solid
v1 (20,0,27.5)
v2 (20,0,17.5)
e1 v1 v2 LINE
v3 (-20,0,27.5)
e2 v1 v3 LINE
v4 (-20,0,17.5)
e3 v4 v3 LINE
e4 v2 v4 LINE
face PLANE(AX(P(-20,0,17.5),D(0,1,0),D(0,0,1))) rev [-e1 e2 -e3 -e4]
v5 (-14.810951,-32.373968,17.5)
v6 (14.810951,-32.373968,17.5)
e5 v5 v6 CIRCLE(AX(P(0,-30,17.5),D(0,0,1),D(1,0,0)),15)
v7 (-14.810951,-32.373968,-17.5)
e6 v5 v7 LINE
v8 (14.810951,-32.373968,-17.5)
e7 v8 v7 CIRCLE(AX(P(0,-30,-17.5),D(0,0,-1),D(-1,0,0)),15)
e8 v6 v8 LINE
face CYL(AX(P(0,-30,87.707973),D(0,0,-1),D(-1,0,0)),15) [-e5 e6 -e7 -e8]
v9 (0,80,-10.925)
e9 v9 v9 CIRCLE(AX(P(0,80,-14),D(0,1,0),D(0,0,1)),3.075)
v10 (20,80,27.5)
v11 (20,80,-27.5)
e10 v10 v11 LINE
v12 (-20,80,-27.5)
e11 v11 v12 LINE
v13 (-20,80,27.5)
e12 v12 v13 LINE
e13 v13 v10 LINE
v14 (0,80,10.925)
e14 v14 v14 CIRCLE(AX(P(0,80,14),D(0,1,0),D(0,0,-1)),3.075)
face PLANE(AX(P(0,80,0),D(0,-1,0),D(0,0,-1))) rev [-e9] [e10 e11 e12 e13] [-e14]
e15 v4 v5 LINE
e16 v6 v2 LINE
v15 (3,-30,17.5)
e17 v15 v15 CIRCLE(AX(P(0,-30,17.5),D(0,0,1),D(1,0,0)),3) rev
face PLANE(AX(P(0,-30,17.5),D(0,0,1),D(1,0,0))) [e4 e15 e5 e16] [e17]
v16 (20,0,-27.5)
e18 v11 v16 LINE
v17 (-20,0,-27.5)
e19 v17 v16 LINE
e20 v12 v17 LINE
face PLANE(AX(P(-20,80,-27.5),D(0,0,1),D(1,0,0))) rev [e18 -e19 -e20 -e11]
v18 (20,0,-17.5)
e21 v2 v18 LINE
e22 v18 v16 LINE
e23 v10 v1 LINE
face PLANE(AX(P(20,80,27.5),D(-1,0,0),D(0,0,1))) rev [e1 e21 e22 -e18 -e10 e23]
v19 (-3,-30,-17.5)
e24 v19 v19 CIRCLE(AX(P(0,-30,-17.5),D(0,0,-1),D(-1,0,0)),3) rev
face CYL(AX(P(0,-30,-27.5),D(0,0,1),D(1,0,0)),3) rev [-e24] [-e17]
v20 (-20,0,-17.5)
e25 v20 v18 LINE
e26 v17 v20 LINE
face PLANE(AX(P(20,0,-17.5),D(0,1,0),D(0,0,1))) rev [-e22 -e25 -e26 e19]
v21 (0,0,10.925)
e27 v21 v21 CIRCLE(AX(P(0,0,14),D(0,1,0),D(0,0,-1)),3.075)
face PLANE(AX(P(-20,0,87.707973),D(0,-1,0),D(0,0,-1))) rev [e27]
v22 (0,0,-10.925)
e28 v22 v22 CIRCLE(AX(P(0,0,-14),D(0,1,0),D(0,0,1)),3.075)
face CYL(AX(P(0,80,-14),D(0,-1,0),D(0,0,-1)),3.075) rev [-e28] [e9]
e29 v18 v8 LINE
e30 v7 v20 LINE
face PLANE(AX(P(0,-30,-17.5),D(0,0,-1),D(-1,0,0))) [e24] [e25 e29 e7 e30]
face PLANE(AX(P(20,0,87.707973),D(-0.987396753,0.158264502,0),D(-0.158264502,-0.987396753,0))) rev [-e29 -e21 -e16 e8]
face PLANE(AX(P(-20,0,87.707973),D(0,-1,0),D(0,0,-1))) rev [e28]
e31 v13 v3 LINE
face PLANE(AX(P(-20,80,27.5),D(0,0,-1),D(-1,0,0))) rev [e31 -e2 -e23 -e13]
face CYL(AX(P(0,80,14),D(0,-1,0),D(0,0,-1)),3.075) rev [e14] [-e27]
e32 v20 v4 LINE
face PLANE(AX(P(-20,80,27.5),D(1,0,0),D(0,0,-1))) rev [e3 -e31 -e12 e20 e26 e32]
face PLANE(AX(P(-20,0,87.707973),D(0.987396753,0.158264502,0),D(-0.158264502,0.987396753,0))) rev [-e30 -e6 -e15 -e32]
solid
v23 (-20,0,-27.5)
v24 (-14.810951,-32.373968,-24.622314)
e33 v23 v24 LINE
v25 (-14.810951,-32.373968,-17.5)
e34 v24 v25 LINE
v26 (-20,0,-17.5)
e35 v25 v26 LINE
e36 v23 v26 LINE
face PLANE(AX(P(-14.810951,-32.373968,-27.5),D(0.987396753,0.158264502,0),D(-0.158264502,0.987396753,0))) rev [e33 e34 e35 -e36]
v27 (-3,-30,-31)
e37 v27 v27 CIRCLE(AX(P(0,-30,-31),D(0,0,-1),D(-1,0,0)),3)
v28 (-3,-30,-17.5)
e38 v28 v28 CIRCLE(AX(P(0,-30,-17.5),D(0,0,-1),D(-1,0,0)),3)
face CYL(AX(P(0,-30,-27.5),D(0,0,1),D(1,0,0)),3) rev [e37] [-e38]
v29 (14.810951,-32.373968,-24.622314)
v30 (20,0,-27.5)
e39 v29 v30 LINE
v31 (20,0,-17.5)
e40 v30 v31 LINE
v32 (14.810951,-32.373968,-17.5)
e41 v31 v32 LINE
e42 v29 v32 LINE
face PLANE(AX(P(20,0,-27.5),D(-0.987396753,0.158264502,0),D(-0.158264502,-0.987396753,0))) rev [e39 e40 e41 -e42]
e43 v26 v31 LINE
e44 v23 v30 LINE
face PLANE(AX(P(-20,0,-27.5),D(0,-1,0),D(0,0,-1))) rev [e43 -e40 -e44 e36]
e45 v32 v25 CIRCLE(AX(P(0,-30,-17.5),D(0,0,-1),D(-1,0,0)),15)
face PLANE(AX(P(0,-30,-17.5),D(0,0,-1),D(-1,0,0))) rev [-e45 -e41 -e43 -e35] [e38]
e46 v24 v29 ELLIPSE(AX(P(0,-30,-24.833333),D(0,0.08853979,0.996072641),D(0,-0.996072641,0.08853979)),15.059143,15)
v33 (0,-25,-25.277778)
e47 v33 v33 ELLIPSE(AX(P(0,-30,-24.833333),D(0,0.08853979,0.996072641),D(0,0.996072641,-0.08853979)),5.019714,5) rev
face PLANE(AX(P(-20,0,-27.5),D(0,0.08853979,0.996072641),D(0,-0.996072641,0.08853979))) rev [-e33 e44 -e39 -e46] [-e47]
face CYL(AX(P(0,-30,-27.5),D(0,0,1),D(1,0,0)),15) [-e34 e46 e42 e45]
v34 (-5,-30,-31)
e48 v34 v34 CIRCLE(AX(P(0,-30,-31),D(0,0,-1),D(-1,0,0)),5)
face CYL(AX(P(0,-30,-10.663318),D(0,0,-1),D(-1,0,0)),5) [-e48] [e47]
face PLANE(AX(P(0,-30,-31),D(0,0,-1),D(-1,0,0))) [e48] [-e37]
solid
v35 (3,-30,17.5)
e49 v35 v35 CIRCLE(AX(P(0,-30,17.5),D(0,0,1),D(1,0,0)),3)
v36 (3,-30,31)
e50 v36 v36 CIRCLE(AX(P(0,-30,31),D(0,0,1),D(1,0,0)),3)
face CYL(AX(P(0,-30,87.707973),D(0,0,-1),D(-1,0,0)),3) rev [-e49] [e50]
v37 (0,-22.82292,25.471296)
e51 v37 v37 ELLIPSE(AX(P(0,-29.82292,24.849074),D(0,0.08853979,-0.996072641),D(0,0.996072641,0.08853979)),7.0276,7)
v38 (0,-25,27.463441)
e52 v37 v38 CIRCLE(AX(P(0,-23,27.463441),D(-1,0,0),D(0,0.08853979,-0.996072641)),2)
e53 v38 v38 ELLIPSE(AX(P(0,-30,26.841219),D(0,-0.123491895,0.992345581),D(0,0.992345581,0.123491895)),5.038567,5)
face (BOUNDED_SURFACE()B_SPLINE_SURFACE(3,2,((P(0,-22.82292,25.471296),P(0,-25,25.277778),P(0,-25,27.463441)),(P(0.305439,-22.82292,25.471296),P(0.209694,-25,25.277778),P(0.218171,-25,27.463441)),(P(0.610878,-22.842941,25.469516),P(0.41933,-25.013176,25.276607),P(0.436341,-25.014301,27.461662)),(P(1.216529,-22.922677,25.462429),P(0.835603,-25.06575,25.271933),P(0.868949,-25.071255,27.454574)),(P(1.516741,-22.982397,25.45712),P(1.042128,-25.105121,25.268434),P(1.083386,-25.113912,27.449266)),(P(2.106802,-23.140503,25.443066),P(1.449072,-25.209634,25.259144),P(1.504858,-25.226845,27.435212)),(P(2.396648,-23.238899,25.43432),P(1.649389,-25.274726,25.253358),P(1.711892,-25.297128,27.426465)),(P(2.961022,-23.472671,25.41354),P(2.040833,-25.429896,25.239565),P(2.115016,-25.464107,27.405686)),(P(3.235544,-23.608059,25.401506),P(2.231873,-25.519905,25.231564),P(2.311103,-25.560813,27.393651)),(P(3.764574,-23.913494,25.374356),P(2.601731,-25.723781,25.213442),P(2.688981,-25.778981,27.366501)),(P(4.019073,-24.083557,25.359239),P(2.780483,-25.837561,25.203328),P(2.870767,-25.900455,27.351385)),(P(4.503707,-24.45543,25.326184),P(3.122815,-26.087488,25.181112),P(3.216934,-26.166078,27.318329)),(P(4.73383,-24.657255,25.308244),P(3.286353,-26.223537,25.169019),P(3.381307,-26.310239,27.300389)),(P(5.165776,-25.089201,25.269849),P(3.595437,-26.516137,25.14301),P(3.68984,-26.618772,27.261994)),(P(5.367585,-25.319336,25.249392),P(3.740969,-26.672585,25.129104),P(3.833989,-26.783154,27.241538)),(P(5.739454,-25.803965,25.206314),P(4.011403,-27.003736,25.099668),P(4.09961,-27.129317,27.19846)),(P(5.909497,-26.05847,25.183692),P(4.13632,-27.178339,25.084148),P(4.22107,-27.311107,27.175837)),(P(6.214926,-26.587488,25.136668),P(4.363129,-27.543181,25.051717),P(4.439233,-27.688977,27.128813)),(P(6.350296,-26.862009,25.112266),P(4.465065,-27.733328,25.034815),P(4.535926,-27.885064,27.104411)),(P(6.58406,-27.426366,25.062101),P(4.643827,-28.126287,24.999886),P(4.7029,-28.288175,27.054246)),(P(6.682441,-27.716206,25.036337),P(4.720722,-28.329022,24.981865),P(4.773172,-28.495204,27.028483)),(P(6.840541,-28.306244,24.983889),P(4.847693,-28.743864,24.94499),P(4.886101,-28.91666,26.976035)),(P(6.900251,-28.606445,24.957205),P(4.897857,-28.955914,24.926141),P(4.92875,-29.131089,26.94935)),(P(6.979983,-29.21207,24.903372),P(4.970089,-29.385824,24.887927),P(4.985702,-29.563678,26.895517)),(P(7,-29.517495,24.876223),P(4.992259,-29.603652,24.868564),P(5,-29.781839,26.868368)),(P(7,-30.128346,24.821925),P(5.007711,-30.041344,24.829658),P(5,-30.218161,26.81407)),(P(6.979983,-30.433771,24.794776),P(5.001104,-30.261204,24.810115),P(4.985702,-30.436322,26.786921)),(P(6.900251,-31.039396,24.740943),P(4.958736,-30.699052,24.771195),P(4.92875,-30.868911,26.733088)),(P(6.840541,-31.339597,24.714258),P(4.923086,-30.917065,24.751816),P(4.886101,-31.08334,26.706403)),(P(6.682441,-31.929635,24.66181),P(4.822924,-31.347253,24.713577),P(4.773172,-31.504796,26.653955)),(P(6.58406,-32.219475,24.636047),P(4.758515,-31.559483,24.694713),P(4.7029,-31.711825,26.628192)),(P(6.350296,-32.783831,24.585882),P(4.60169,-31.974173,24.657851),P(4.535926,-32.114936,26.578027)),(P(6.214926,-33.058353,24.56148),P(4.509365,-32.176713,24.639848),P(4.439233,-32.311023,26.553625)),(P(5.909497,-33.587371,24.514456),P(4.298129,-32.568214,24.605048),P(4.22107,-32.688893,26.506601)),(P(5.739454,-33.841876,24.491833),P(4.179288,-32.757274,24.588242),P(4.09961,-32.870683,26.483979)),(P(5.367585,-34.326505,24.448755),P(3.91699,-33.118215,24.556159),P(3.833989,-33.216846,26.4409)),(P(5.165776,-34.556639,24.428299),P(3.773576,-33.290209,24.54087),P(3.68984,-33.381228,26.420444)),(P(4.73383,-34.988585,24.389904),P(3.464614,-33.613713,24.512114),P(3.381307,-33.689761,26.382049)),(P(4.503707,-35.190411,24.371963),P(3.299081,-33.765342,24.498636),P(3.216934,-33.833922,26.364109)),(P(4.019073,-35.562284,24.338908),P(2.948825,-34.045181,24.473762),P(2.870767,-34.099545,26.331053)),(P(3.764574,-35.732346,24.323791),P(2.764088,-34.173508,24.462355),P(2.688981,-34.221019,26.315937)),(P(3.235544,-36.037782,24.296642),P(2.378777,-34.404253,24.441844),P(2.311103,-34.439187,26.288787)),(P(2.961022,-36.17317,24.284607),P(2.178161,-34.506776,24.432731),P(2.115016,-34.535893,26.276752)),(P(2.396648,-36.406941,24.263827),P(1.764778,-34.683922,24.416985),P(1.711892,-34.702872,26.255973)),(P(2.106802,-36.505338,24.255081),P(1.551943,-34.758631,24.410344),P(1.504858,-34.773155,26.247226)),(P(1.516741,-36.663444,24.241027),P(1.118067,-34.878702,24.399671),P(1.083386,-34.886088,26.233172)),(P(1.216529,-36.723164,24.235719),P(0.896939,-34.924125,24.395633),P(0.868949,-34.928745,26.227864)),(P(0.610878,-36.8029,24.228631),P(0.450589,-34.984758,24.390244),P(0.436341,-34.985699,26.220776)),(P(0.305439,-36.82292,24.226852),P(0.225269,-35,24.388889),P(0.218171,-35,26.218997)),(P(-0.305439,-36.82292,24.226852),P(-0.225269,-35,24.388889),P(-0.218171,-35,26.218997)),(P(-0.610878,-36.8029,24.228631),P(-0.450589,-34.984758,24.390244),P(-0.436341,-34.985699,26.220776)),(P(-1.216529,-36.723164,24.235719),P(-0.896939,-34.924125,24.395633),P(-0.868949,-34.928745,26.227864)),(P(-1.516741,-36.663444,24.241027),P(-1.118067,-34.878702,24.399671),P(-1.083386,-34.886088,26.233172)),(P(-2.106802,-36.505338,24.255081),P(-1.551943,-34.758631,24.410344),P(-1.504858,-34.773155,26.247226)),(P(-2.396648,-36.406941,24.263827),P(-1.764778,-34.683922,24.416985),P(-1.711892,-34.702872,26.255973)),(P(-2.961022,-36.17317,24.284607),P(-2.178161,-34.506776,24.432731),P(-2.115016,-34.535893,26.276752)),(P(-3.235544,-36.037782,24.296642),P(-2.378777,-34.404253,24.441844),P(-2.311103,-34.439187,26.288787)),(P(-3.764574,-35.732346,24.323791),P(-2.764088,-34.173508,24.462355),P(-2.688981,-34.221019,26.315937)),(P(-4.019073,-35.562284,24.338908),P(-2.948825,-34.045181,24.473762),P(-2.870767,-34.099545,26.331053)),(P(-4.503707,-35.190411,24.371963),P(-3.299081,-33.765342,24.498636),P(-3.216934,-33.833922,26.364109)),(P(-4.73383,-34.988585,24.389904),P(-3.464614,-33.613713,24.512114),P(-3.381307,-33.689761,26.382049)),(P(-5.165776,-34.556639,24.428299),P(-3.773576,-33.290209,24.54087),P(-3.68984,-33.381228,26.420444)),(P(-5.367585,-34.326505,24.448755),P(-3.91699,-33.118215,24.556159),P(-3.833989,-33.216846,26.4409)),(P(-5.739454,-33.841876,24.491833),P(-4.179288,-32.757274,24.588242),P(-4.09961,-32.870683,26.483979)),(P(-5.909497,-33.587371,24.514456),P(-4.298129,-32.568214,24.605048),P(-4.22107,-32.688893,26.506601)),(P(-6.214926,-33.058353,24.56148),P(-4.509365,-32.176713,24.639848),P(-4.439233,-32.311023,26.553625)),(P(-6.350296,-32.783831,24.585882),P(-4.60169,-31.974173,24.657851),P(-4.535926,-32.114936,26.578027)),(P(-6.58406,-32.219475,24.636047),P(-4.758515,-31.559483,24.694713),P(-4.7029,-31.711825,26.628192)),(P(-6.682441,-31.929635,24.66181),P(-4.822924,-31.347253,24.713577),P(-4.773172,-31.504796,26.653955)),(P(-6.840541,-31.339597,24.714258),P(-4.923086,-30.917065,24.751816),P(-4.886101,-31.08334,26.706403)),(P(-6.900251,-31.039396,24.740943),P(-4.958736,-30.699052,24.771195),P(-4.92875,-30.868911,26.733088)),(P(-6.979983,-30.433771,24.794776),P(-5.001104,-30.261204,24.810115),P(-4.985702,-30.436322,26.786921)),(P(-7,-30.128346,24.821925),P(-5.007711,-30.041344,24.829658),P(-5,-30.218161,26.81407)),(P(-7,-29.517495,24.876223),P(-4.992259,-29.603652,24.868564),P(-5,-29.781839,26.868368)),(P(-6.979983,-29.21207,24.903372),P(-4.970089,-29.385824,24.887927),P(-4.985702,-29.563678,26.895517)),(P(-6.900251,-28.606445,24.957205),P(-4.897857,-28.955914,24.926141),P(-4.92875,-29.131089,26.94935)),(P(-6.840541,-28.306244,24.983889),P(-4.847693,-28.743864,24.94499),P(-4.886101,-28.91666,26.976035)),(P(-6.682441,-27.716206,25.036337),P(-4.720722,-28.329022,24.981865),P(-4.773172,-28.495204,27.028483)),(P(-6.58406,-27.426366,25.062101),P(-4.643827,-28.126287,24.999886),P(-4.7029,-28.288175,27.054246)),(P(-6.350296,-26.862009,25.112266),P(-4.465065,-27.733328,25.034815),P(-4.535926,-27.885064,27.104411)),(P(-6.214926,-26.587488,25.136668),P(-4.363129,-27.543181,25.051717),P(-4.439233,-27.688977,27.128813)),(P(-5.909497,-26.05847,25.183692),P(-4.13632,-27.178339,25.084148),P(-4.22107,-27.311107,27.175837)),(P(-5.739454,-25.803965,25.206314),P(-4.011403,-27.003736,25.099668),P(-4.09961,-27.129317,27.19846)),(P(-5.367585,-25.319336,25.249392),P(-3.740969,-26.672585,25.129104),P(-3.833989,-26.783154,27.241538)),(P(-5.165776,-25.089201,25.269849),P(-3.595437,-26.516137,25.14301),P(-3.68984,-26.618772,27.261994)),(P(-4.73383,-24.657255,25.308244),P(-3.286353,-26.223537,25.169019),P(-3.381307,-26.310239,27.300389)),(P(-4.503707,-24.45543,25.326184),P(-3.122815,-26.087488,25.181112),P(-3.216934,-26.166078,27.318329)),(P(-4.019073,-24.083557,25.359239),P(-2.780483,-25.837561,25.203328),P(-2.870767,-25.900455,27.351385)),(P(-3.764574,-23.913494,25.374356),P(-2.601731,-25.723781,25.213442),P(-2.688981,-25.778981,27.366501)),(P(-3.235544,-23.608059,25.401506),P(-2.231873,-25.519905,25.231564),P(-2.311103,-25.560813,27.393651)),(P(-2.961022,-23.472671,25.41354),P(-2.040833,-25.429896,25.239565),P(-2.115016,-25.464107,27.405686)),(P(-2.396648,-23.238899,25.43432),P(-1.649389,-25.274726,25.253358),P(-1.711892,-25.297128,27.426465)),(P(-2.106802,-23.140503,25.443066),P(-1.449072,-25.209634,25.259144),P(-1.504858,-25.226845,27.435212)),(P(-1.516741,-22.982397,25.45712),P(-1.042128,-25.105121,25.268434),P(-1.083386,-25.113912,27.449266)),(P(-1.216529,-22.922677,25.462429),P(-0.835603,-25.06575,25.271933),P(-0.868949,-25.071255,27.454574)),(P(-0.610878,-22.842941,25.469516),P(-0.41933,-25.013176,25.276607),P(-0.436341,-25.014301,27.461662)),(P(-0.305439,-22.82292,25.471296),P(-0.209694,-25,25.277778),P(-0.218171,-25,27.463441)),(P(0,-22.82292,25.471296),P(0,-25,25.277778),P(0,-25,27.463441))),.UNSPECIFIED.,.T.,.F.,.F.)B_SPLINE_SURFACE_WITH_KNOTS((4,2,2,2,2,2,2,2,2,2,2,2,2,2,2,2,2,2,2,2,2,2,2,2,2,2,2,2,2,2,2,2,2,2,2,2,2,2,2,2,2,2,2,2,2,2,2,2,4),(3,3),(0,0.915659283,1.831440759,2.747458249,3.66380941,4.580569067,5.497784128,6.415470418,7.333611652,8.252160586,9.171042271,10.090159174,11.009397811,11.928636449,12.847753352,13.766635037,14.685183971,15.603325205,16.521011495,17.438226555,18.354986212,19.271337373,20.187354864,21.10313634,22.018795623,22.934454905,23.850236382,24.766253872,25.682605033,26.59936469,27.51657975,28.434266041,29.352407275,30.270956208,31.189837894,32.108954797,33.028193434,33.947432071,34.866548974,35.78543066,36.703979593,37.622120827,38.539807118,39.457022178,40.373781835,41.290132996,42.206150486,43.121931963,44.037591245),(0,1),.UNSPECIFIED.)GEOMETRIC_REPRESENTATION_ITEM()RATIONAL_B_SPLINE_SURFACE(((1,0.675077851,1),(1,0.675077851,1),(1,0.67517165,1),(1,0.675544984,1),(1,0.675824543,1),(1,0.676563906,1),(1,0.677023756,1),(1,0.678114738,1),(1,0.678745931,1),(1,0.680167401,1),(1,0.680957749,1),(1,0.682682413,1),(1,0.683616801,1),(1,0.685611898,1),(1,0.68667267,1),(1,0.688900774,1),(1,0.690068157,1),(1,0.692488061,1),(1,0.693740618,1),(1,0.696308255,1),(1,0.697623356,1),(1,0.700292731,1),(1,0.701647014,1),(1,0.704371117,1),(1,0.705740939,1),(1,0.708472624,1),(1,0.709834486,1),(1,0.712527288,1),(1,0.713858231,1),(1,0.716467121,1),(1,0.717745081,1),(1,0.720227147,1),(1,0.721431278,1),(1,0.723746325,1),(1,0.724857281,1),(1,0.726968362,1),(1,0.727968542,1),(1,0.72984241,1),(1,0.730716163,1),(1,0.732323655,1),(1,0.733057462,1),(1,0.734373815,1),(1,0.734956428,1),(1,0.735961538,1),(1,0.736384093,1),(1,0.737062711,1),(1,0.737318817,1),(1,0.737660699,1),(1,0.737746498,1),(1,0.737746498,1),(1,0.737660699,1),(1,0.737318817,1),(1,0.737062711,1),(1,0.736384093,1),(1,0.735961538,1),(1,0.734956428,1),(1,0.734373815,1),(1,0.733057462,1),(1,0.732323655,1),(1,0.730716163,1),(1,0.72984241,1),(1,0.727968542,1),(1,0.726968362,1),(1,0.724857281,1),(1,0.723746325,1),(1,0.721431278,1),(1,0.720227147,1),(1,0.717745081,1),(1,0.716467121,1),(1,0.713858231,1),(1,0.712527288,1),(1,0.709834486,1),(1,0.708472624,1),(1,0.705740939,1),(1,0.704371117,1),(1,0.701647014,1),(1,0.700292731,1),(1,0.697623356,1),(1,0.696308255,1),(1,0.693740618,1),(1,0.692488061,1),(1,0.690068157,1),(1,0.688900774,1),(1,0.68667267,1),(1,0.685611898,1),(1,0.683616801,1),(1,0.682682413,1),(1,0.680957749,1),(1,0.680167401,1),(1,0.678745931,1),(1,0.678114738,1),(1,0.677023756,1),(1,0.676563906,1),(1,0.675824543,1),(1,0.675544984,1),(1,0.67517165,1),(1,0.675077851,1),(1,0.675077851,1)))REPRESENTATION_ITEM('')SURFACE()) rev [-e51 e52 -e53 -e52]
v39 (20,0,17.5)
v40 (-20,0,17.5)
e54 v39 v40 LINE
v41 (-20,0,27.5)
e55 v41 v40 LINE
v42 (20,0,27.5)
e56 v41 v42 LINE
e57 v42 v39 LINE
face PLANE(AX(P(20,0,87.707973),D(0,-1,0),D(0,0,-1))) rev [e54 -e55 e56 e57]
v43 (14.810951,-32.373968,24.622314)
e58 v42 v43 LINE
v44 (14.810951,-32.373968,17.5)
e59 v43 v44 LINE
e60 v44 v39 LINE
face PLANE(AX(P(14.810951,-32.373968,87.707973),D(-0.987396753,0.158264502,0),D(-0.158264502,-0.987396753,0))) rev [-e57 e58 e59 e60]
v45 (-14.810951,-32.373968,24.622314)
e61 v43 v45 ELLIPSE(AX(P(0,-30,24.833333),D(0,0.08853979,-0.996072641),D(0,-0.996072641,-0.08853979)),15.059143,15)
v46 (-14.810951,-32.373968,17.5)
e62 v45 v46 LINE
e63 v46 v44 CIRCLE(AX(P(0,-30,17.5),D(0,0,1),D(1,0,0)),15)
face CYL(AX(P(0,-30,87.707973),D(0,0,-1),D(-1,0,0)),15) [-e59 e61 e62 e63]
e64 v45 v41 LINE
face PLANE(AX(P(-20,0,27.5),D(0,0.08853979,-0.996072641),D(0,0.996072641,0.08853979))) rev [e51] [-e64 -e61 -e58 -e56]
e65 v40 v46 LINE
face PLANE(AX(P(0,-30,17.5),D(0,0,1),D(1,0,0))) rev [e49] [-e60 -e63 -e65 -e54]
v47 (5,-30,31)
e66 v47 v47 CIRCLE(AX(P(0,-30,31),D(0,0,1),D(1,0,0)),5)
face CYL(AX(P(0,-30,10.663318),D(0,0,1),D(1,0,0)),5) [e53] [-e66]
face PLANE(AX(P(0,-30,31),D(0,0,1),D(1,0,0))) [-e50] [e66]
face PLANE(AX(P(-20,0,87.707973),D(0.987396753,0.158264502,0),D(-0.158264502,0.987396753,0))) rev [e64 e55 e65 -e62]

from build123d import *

# Parameters (mm, degrees)
CROQUIS1_W                          = 40
CROQUIS1_H                          = 55
SALIENTE_EXTRUIR1_DEPTH             = 80
CROQUIS2_R                          = 3.075
CORTAR_EXTRUIR2_DEPTH               = 87.926693254
SALIENTE_EXTRUIR2_REACH             = 88.927
SALIENTE_EXTRUIR2_DIRECTION_2_REACH = 88.927
CORTAR_EXTRUIR6_DEPTH               = 87.926693254
CORTAR_EXTRUIR6_DEPTH_BACK          = 87.926693254
CROQUIS6_R                          = 3
CORTAR_EXTRUIR10_DEPTH              = 10
CROQUIS11_R                         = 3
SALIENTE_EXTRUIR3_DEPTH             = 10
CORTAR_EXTRUIR11_DEPTH              = 87.926693254
CORTAR_EXTRUIR11_DEPTH_BACK         = 87.926693254
CORTAR_EXTRUIR15_START              = -10
CORTAR_EXTRUIR15_DEPTH              = 10
CROQUIS17_R                         = 3
SALIENTE_EXTRUIR4_DEPTH             = 10
CORTAR_EXTRUIR16_DEPTH              = 87.926693254
CORTAR_EXTRUIR16_DEPTH_BACK         = 87.926693254
CROQUIS21_R                         = 5
CROQUIS21_R_2                       = 3
SALIENTE_EXTRUIR5_DEPTH             = 3.5
SALIENTE_EXTRUIR5_DIRECTION_2_REACH = 101.121
REDONDEO1_R                         = 2
CROQUIS22_R                         = 5
CROQUIS22_R_2                       = 3
SALIENTE_EXTRUIR6_DEPTH             = 3.5
SALIENTE_EXTRUIR6_DIRECTION_2_REACH = 103.105


with BuildPart() as part:
    # Croquis1 → Saliente-Extruir1 (new body)
    with BuildSketch(Plane(origin=(0, 0, 0), x_dir=(1, 0, 0), z_dir=(0, 1, 0))):
        Rectangle(CROQUIS1_W, CROQUIS1_H)
    extrude(amount=SALIENTE_EXTRUIR1_DEPTH)

    # Croquis2 → Cortar-Extruir2 (cut, through all)
    with BuildSketch(Plane(origin=(0, 0, 0), x_dir=(1, 0, 0), z_dir=(0, 1, 0))):
        with Locations(Location((0, 14, 0), (0, 0, 270))):
            Circle(CROQUIS2_R)
        with Locations(Location((0, -14, 0), (0, 0, 90))):
            Circle(CROQUIS2_R)
    extrude(amount=CORTAR_EXTRUIR2_DEPTH, mode=Mode.SUBTRACT)

    # Saliente-Extruir2: up to this face of the body (flat: up to its plane)
    saliente_extruir2_end = Plane(part.part.faces().sort_by_distance((0, 40, 27.5))[0])
    # Croquis5 → Saliente-Extruir2 (add, up to the picked face)
    with BuildSketch(Plane.XY, mode=Mode.PRIVATE) as saliente_extruir2_sk1:
        with BuildLine():
            Line((-20, 0), (-14.810951292, -32.373967528))
            ThreePointArc((-14.810951292, -32.373967528), (0, -45), (14.810951292, -32.373967528))
            Line((14.810951292, -32.373967528), (20, 0))
            Line((20, 0), (-20, 0))
        make_face()
    saliente_extruir2_tool1 = split(extrude(saliente_extruir2_sk1.sketch, amount=SALIENTE_EXTRUIR2_REACH, mode=Mode.PRIVATE), bisect_by=saliente_extruir2_end, keep=Keep.BOTH, mode=Mode.PRIVATE)
    add(saliente_extruir2_tool1.solids().sort_by(Axis((0, -19.849245, 0), (0, 0, 1)))[0])

    # Saliente-Extruir2 direction 2: up to this face of the body (flat: up to its plane)
    saliente_extruir2_direction_2_end = Plane(part.part.faces().sort_by_distance((0, 40, -27.5))[0])
    # Croquis5 → Saliente-Extruir2 direction 2 (add, up to the picked face)
    with BuildSketch(Plane.XY, mode=Mode.PRIVATE) as saliente_extruir2_direction_2_sk1:
        with BuildLine():
            Line((-20, 0), (-14.810951292, -32.373967528))
            ThreePointArc((-14.810951292, -32.373967528), (0, -45), (14.810951292, -32.373967528))
            Line((14.810951292, -32.373967528), (20, 0))
            Line((20, 0), (-20, 0))
        make_face()
    saliente_extruir2_direction_2_tool1 = split(extrude(saliente_extruir2_direction_2_sk1.sketch, amount=-SALIENTE_EXTRUIR2_DIRECTION_2_REACH, mode=Mode.PRIVATE), bisect_by=saliente_extruir2_direction_2_end, keep=Keep.BOTH, mode=Mode.PRIVATE)
    add(saliente_extruir2_direction_2_tool1.solids().sort_by(Axis((0, -19.849245, 0), (0, 0, -1)))[0])

    # Croquis6 → Cortar-Extruir6 (cut, two sides: drawn at the far end of the back side and taken through both)
    with BuildSketch(Plane.XY.offset(-CORTAR_EXTRUIR6_DEPTH_BACK)):
        with Locations((0, -30)):
            Circle(CROQUIS6_R)
    extrude(amount=CORTAR_EXTRUIR6_DEPTH + CORTAR_EXTRUIR6_DEPTH_BACK, mode=Mode.SUBTRACT)

    # Croquis10 → Cortar-Extruir10 (cut)
    with BuildSketch(Plane(origin=(0, 0, -27.5), x_dir=(-1, 0, 0), z_dir=(0, 0, -1))):
        with BuildLine():
            Line((14.810951292, -32.373967528), (20, 0))
            Line((20, 0), (-20, 0))
            Line((-20, 0), (-14.810951292, -32.373967528))
            ThreePointArc((-14.810951292, -32.373967528), (0, -45), (14.810951292, -32.373967528))
        make_face()
    extrude(amount=-CORTAR_EXTRUIR10_DEPTH, mode=Mode.SUBTRACT)

    # Croquis16 → Cortar-Extruir15 (cut)
    with BuildSketch(Plane.XY.offset(27.5).offset(CORTAR_EXTRUIR15_START)):
        with BuildLine():
            Line((-20, 0), (20, 0))
            Line((20, 0), (14.810951292, -32.373967528))
            ThreePointArc((14.810951292, -32.373967528), (0, -45), (-14.810951292, -32.373967528))
            Line((-14.810951292, -32.373967528), (-20, 0))
        make_face()
    extrude(amount=CORTAR_EXTRUIR15_DEPTH, mode=Mode.SUBTRACT)


with BuildPart() as body_2:
    # Croquis11 → Saliente-Extruir3 (new body)
    with BuildSketch(Plane(origin=(0, 0, -17.5), x_dir=(-1, 0, 0), z_dir=(0, 0, -1))):
        with BuildLine():
            Line((20, 0), (-20, 0))
            Line((-20, 0), (-14.810951292, -32.373967528))
            ThreePointArc((-14.810951292, -32.373967528), (0, -45), (14.810951292, -32.373967528))
            Line((14.810951292, -32.373967528), (20, 0))
        make_face()
        with Locations((0, -30)):
            Circle(CROQUIS11_R, mode=Mode.SUBTRACT)
    extrude(amount=SALIENTE_EXTRUIR3_DEPTH)

    # Croquis12 → Cortar-Extruir11 (cut, two sides: drawn at the far end of the back side and taken through both)
    with BuildSketch(Plane(origin=(0, 0, 0), x_dir=(0, 0, -1), z_dir=(1, 0, 0)).offset(-CORTAR_EXTRUIR11_DEPTH_BACK)):
        with BuildLine():
            Line((27.5, 0), (23.5, -45))
            add(Edge.make_bspline(
                [(23.5, -45), (53.895048744, -65.691423054), (27.5, 0)],
                knots=[0, 0, 0, 1, 1, 1], degree=2))
        make_face()
    extrude(amount=CORTAR_EXTRUIR11_DEPTH + CORTAR_EXTRUIR11_DEPTH_BACK, mode=Mode.SUBTRACT)

    # Croquis22 → Saliente-Extruir6 (add)
    with BuildSketch(Plane(origin=(0, 0, -27.5), x_dir=(-1, 0, 0), z_dir=(0, 0, -1))):
        with Locations(Location((0, -30, 0), (0, 0, 180))):
            Circle(CROQUIS22_R)
        with Locations(Location((0, -30, 0), (0, 0, 180))):
            Circle(CROQUIS22_R_2, mode=Mode.SUBTRACT)
    extrude(amount=SALIENTE_EXTRUIR6_DEPTH)

    # Saliente-Extruir6 direction 2: up to this face of the body (flat: up to its plane)
    saliente_extruir6_direction_2_end = Plane(body_2.part.faces().sort_by_distance((0, -19.641450964, -25.754093248))[0])
    # Croquis22 → Saliente-Extruir6 direction 2 (add, up to the picked face)
    with BuildSketch(Plane(origin=(0, 0, -27.5), x_dir=(-1, 0, 0), z_dir=(0, 0, -1)), mode=Mode.PRIVATE) as saliente_extruir6_direction_2_sk1:
        with Locations(Location((0, -30, 0), (0, 0, 180))):
            Circle(CROQUIS22_R)
        with Locations(Location((0, -30, 0), (0, 0, 180))):
            Circle(CROQUIS22_R_2, mode=Mode.SUBTRACT)
    saliente_extruir6_direction_2_tool1 = split(extrude(saliente_extruir6_direction_2_sk1.sketch, amount=-SALIENTE_EXTRUIR6_DIRECTION_2_REACH, mode=Mode.PRIVATE), bisect_by=saliente_extruir6_direction_2_end, keep=Keep.BOTH, mode=Mode.PRIVATE)
    add(saliente_extruir6_direction_2_tool1.solids().sort_by(Axis((-4.858579, -30, -27.5), (0, 0, 1)))[0])


with BuildPart() as body_3:
    # Croquis17 → Saliente-Extruir4 (new body)
    with BuildSketch(Plane.XY.offset(17.5)):
        with BuildLine():
            Line((14.810951292, -32.373967528), (20, 0))
            Line((20, 0), (-20, 0))
            Line((-20, 0), (-14.810951292, -32.373967528))
            ThreePointArc((-14.810951292, -32.373967528), (0, -45), (14.810951292, -32.373967528))
        make_face()
        with Locations(Location((0, -30, 0), (0, 0, 180))):
            Circle(CROQUIS17_R, mode=Mode.SUBTRACT)
    extrude(amount=SALIENTE_EXTRUIR4_DEPTH)

    # Croquis18 → Cortar-Extruir16 (cut, two sides: drawn at the far end of the back side and taken through both)
    with BuildSketch(Plane(origin=(0, 0, 0), x_dir=(0, 0, -1), z_dir=(1, 0, 0)).offset(-CORTAR_EXTRUIR16_DEPTH_BACK)):
        with BuildLine():
            Line((-27.5, 0), (-23.5, -45))
            add(Edge.make_bspline(
                [(-23.5, -45), (-50.99373039, -70.964066745), (-27.5, 0)],
                knots=[0, 0, 0, 1, 1, 1], degree=2))
        make_face()
    extrude(amount=CORTAR_EXTRUIR16_DEPTH + CORTAR_EXTRUIR16_DEPTH_BACK, mode=Mode.SUBTRACT)

    # Croquis21 → Saliente-Extruir5 (add)
    with BuildSketch(Plane.XY.offset(27.5)):
        with Locations((0, -30)):
            Circle(CROQUIS21_R)
        with Locations((0, -30)):
            Circle(CROQUIS21_R_2, mode=Mode.SUBTRACT)
    extrude(amount=SALIENTE_EXTRUIR5_DEPTH)

    # Saliente-Extruir5 direction 2: up to this face of the body (flat: up to its plane)
    saliente_extruir5_direction_2_end = Plane(body_3.part.faces().sort_by_distance((0, -19.641450964, 25.754093248))[0])
    # Croquis21 → Saliente-Extruir5 direction 2 (add, up to the picked face)
    with BuildSketch(Plane.XY.offset(27.5), mode=Mode.PRIVATE) as saliente_extruir5_direction_2_sk1:
        with Locations((0, -30)):
            Circle(CROQUIS21_R)
        with Locations((0, -30)):
            Circle(CROQUIS21_R_2, mode=Mode.SUBTRACT)
    saliente_extruir5_direction_2_tool1 = split(extrude(saliente_extruir5_direction_2_sk1.sketch, amount=-SALIENTE_EXTRUIR5_DIRECTION_2_REACH, mode=Mode.PRIVATE), bisect_by=saliente_extruir5_direction_2_end, keep=Keep.BOTH, mode=Mode.PRIVATE)
    add(saliente_extruir5_direction_2_tool1.solids().sort_by(Axis((-4.858579, -30, 27.5), (0, 0, -1)))[0])

    # Redondeo1
    redondeo1_edges = [body_3.edges().sort_by_distance(p)[0] for p in [
        (-5, -30.00000001, 24.833333332),
    ]]
    fillet(redondeo1_edges, radius=REDONDEO1_R)


solid = Compound([part.part, body_2.part, body_3.part])
